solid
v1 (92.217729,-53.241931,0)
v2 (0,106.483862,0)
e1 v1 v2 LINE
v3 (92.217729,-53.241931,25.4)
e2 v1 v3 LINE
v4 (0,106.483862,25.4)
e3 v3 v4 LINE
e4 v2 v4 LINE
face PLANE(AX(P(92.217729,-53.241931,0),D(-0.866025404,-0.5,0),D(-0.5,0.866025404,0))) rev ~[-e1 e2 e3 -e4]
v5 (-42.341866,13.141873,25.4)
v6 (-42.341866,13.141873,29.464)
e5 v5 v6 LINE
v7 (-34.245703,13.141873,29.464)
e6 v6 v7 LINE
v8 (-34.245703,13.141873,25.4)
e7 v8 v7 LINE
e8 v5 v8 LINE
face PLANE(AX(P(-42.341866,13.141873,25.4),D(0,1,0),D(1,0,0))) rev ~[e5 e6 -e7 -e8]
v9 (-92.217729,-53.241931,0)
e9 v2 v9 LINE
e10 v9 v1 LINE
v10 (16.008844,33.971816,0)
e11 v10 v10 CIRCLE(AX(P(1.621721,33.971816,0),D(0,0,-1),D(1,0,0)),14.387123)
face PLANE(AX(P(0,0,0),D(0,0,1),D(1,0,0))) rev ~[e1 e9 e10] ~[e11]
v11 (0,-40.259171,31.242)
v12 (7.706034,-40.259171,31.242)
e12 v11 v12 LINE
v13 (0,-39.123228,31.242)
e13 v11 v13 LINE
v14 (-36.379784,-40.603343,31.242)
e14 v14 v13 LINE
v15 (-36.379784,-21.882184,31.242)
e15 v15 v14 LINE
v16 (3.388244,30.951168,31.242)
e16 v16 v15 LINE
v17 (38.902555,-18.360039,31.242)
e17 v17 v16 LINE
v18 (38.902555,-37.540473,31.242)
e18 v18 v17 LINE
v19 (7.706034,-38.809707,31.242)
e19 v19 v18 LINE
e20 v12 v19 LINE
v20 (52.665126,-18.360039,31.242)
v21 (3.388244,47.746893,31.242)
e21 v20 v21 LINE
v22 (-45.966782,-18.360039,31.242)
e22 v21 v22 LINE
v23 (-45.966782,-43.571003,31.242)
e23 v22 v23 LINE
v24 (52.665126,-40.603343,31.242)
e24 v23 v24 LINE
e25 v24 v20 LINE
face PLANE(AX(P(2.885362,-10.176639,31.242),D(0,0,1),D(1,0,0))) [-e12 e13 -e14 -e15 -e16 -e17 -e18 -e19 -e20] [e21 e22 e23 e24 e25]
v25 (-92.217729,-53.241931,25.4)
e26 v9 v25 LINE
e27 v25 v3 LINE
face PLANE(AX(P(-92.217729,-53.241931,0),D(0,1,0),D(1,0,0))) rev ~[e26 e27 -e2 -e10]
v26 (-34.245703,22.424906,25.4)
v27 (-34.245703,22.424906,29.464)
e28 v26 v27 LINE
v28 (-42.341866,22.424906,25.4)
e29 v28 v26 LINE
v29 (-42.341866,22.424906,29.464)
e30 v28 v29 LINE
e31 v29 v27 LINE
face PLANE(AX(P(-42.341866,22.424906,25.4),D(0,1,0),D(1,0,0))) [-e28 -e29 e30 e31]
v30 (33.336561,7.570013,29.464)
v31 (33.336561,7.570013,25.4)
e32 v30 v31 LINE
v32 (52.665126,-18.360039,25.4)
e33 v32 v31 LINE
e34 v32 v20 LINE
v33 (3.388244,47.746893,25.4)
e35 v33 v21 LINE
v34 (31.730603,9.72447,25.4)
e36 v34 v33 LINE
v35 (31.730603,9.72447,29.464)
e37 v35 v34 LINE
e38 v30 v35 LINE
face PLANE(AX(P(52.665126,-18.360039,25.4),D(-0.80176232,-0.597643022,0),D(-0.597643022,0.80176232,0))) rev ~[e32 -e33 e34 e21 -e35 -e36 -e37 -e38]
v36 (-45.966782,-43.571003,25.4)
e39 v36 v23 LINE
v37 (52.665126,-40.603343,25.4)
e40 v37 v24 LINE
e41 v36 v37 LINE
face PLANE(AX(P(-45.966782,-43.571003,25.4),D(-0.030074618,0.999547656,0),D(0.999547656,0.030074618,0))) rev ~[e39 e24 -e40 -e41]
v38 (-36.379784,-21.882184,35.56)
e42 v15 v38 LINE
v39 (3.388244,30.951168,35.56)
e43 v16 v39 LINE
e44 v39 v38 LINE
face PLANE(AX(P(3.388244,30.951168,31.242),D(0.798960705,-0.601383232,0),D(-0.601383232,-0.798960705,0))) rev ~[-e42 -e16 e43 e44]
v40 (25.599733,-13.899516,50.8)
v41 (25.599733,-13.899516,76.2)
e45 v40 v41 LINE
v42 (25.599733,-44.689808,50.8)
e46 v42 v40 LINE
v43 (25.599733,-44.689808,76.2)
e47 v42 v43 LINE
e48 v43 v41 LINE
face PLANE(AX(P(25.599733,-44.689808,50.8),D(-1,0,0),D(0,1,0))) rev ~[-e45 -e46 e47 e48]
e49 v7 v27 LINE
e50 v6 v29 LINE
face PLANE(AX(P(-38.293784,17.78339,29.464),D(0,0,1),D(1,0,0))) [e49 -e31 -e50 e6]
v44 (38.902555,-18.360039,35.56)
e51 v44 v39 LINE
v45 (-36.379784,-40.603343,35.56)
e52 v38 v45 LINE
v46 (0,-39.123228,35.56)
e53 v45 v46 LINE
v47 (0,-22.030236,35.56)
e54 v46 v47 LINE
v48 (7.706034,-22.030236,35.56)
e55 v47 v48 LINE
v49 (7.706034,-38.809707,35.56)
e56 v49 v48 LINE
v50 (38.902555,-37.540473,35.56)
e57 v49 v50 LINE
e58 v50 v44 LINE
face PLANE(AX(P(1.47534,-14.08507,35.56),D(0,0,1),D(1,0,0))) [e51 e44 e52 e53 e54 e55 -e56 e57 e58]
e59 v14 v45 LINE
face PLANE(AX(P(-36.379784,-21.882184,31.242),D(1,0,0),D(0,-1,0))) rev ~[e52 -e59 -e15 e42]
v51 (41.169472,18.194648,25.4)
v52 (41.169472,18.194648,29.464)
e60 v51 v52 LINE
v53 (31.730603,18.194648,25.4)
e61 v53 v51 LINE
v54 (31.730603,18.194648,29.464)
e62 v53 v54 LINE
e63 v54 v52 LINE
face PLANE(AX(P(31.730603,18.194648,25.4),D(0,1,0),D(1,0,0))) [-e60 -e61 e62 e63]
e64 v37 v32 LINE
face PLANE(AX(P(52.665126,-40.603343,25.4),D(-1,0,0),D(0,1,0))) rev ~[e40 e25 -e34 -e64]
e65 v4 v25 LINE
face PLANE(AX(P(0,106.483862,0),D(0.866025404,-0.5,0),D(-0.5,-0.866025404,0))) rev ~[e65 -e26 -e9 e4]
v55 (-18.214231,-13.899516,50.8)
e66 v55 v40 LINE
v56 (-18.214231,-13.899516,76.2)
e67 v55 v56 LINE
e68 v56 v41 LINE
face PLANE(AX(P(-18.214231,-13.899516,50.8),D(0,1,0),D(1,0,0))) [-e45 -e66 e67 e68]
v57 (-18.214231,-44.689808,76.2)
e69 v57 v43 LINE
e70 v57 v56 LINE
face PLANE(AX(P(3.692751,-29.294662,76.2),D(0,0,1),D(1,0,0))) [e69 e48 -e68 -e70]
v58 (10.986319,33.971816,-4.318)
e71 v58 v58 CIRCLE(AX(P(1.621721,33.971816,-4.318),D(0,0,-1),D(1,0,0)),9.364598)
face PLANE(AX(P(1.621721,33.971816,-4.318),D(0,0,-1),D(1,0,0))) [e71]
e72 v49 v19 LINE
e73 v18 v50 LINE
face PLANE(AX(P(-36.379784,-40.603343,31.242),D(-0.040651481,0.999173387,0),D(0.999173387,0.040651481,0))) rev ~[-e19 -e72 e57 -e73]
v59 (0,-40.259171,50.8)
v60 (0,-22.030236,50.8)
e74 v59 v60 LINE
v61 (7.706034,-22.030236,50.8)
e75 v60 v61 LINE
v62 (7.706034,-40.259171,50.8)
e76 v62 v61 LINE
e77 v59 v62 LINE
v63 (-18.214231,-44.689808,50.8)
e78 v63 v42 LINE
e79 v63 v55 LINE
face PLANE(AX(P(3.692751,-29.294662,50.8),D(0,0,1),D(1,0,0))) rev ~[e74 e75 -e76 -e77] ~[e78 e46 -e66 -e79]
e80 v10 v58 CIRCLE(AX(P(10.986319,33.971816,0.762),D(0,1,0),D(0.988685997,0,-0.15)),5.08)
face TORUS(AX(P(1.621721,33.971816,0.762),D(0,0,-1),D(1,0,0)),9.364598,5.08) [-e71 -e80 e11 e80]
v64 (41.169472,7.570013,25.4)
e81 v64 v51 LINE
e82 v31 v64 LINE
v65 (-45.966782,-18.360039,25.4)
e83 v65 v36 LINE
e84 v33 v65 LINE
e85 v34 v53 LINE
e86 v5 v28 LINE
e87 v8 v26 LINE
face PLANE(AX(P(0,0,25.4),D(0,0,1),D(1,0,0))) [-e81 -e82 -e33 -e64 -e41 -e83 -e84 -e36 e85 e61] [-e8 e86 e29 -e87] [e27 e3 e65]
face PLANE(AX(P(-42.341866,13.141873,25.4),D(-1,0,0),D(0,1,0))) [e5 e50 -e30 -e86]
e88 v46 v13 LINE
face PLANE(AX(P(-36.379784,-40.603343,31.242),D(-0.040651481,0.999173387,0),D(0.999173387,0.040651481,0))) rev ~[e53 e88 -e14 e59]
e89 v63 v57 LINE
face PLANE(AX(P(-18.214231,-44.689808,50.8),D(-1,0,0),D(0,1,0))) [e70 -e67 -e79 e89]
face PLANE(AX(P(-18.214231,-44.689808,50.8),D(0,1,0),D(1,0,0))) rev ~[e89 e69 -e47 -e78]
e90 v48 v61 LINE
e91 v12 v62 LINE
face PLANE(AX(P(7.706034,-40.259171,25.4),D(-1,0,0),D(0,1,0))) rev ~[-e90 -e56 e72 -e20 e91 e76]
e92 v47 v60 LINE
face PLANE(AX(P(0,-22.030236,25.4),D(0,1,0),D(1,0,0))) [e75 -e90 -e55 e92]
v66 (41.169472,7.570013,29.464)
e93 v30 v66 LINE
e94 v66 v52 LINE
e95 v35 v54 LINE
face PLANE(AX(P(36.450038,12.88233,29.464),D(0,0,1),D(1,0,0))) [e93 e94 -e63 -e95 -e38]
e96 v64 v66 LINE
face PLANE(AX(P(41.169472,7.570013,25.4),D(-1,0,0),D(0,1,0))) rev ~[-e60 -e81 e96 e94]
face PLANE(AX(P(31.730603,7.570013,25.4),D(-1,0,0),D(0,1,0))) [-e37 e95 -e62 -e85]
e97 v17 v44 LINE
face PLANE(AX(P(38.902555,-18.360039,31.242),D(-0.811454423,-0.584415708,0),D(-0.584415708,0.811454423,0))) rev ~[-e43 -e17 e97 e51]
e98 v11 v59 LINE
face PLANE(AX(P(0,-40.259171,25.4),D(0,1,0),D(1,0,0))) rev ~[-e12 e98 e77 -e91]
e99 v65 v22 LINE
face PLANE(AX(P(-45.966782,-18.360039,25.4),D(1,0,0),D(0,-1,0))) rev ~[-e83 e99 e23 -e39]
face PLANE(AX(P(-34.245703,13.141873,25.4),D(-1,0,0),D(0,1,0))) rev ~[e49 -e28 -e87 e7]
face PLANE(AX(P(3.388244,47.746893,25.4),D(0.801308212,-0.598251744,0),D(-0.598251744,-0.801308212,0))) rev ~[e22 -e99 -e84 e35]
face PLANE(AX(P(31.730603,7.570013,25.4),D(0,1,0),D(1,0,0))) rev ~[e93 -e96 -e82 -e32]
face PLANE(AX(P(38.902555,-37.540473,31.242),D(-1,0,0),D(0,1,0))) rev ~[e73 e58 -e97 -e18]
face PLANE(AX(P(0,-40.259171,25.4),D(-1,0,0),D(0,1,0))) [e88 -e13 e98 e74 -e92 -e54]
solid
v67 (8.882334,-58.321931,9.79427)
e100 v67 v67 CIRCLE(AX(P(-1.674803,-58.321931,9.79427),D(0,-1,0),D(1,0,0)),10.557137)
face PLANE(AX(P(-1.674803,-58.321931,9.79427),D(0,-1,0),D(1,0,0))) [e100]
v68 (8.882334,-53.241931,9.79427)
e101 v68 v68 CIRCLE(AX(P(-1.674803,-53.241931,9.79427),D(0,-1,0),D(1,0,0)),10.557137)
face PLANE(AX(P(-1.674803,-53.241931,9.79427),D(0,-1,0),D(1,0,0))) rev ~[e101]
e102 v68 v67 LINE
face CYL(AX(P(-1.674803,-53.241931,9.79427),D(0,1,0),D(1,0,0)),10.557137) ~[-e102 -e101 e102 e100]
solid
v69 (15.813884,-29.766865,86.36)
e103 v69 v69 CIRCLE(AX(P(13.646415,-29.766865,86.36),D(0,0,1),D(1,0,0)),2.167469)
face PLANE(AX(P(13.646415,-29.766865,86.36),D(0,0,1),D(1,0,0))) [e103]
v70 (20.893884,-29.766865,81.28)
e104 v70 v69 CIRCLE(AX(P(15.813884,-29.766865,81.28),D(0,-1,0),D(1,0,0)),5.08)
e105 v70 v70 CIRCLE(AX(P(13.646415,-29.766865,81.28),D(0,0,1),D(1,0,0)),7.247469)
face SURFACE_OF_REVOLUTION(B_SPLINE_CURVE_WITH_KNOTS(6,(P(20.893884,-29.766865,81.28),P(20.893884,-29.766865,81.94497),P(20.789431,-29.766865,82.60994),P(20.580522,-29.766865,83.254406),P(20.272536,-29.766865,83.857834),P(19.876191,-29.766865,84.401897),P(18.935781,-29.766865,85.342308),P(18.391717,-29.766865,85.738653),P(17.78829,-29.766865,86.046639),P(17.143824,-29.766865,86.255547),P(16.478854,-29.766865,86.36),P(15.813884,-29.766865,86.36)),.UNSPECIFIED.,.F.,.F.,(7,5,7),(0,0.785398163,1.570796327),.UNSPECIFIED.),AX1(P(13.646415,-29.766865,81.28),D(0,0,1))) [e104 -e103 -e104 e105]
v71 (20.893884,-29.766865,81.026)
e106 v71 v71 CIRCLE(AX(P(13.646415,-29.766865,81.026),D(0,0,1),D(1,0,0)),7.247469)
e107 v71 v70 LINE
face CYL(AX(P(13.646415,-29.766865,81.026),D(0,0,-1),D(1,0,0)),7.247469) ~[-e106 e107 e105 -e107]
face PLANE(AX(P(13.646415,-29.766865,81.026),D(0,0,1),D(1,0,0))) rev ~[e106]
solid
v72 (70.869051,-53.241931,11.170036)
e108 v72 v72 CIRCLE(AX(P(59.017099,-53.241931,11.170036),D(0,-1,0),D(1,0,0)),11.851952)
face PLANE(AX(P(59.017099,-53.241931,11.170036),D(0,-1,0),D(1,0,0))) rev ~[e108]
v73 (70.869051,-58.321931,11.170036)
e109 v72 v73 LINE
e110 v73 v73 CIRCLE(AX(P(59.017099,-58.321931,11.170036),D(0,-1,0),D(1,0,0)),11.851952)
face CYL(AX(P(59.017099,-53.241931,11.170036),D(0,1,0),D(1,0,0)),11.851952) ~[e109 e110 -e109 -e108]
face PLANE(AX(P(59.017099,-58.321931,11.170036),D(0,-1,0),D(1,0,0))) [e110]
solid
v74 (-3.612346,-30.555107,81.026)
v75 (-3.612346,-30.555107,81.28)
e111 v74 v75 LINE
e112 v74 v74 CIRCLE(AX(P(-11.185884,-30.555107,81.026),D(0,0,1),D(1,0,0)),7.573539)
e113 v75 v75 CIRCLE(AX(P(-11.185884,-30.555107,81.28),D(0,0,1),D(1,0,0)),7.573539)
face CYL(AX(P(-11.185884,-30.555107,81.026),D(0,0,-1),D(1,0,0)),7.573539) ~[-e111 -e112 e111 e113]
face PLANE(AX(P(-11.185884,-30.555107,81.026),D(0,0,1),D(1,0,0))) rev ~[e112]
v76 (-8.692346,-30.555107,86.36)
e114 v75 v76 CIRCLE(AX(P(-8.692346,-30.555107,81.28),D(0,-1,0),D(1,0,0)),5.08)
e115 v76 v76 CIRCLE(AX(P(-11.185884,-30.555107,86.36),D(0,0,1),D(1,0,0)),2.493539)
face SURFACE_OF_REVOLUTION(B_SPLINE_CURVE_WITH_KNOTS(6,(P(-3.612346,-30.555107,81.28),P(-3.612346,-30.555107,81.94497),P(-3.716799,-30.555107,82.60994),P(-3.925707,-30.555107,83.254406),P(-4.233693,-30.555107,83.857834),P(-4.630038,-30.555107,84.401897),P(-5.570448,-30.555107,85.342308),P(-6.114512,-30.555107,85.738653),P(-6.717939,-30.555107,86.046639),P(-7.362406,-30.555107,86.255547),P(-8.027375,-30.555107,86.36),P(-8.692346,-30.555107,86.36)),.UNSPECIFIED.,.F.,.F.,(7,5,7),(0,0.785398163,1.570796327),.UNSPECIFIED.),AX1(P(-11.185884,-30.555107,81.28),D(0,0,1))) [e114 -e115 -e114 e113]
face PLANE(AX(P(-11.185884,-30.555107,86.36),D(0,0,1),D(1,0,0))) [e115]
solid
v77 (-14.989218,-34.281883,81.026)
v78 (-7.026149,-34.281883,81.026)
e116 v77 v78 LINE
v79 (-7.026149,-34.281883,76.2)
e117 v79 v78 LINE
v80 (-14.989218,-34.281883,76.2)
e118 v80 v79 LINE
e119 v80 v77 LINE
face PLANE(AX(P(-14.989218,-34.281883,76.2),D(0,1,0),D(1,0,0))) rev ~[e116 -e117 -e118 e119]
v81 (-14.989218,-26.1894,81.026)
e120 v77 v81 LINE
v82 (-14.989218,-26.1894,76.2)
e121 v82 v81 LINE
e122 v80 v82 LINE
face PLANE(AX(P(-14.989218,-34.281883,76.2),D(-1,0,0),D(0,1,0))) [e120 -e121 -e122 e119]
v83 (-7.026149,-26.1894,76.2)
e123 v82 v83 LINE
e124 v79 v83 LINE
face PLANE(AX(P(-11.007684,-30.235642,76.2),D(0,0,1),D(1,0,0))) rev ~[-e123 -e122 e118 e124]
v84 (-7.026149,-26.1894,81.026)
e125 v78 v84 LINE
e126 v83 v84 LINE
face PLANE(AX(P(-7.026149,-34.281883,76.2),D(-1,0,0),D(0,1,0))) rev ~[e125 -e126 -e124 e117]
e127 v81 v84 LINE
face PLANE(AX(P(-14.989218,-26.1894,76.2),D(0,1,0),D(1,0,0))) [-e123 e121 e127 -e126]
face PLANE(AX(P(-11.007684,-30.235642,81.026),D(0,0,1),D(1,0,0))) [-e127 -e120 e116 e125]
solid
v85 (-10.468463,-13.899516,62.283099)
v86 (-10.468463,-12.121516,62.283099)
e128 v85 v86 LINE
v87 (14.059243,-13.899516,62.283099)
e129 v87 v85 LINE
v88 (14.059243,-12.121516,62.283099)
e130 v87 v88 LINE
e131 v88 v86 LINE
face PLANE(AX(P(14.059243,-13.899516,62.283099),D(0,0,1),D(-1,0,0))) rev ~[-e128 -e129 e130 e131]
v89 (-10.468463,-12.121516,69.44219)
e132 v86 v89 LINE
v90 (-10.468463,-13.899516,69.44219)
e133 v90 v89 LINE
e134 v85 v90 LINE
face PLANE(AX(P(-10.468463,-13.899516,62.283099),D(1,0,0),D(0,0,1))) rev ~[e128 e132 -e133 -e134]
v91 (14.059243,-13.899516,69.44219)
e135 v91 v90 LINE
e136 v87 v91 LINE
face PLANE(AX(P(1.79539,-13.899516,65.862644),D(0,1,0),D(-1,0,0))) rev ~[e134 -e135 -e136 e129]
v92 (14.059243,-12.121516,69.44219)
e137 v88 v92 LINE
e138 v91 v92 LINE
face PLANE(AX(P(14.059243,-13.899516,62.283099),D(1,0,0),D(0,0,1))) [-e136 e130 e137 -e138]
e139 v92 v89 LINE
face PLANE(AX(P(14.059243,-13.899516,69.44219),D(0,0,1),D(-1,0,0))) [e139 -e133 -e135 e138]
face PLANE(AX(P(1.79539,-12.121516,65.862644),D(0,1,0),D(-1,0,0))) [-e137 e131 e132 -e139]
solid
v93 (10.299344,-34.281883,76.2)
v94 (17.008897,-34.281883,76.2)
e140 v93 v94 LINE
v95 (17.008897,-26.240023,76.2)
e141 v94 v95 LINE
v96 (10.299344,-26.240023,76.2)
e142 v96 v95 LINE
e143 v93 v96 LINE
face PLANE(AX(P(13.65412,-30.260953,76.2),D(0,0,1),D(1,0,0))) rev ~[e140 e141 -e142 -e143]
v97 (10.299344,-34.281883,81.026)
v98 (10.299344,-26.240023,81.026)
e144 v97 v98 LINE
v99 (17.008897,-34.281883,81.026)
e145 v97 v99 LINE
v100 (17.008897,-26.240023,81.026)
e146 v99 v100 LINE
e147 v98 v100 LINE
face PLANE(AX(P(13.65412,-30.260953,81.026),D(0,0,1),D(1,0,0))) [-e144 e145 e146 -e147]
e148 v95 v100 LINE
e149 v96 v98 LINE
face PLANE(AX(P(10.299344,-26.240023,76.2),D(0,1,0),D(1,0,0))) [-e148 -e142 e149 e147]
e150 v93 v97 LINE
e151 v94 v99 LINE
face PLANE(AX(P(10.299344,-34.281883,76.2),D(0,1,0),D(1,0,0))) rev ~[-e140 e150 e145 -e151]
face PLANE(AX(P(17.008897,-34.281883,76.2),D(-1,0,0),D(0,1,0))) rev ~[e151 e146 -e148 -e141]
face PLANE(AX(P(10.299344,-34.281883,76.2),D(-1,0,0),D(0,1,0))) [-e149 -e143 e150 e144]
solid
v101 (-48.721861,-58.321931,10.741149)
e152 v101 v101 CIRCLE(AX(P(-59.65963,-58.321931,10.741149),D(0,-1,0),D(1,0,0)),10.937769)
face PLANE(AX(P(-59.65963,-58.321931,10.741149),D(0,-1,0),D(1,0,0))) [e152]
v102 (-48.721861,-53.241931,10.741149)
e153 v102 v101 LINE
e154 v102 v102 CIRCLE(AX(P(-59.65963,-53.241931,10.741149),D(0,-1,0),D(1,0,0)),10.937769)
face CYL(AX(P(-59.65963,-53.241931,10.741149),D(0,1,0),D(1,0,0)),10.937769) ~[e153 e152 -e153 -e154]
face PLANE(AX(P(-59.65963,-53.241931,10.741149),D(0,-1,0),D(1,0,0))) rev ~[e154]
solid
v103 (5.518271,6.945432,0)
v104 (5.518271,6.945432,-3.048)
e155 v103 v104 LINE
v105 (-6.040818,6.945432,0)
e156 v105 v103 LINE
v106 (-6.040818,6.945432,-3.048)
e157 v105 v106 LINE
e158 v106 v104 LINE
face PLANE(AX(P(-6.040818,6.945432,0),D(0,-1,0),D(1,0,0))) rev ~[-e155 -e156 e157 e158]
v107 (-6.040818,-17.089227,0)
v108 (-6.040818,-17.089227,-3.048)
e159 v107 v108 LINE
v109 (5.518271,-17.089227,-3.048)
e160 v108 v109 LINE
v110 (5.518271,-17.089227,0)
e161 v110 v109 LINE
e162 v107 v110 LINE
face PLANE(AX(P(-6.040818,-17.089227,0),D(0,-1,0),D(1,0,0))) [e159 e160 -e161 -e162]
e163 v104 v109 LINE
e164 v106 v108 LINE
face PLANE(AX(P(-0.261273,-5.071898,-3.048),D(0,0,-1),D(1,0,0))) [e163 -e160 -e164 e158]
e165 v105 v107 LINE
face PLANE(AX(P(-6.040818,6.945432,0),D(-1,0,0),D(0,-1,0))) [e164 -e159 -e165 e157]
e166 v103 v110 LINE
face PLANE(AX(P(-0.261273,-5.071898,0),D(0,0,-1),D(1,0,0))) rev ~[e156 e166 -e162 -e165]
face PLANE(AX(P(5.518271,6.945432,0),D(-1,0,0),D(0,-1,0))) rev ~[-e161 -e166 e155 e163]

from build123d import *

# Parameters (mm, degrees)
F1_DEPTH  = 25.4
F2_W      = 7.7060335316
F2_H      = 18.2289350778
F3_DEPTH  = 25.4
F4_W      = 43.813964352
F4_H      = 30.7902917266
F5_DEPTH  = 25.4
F7_DEPTH  = 5.842
F9_DEPTH  = 4.318
F10_R     = 10.9377694976
F11_DEPTH = 5.08
F10_R_2   = 10.5571366777
F10_R_3   = 11.8519516329
F12_W     = 11.5590882488
F12_H     = 24.0346593782
F13_DEPTH = 3.048
F14_R     = 14.3871232907
F15_DEPTH = 4.318
F17_W     = 24.5277062058
F17_H     = 7.1590915322
F18_DEPTH = 1.778
F19_W     = 8.0961622298
F19_H     = 9.2830331996
F19_W_2   = 9.4388686121
F19_H_2   = 10.6246345676
F20_DEPTH = 4.064
F21_W     = 6.7095533013
F21_H     = 8.0418605357
F22_DEPTH = 4.826
F21_W_2   = 7.9630683176
F21_H_2   = 8.0924835056
F23_R     = 7.24746932
F24_DEPTH = 5.334
F23_R_2   = 7.57353882
F25_R     = 5.08
F26_R     = 5.08


# Not quite as in the source:
# - a fillet or chamfer that OpenCascade refuses, or shapes differently, is made with other operations: its cross-section is extruded or revolved along the edge and cut away or added


with BuildPart() as f1:
    # F0 (on Top) → F1 (new body)
    with BuildSketch(Plane.XY):
        Polygon((-92.2177294153, -53.241930902), (92.2177294153, -53.241930902), (0, 106.483861804), align=None)
    extrude(amount=F1_DEPTH)

    # F2 (on face) → F3 (join)
    with BuildSketch(Plane.XY.offset(25.4)):
        with Locations((3.8530167658, -31.1447037384)):
            Rectangle(F2_W, F2_H)
    extrude(amount=F3_DEPTH)

    # F4 (on face) → F5 (join)
    with BuildSketch(Plane.XY.offset(50.8)):
        with Locations((3.692750819, -29.2946621776)):
            Rectangle(F4_W, F4_H)
    extrude(amount=F5_DEPTH)

    # F6 (on face) → F7 (join)
    with BuildSketch(Plane.XY.offset(25.4)):
        Polygon((-45.9667816758, -43.5710027814), (52.6651255786, -40.6033433974), (52.6651255786, -18.3600392193), (3.388244193, 47.7468930185), (-45.9667816758, -18.3600392193), align=None)
    extrude(amount=F7_DEPTH)

    # F8 (on face) → F9 (join)
    with BuildSketch(Plane.XY.offset(31.242)):
        Polygon((-36.3797843456, -40.6033433974), (38.902554661, -37.5404730439), (38.902554661, -18.3600392193), (3.388244193, 30.9511683881), (-36.3797843456, -21.8821838498), align=None)
    extrude(amount=F9_DEPTH)

    # F14 (on face) → F15 (join)
    with BuildSketch(Plane(origin=(0, 0, 0), x_dir=(1, 0, 0), z_dir=(0, 0, -1))):
        with Locations((1.6217207303, -33.9718163013)):
            Circle(F14_R)
    extrude(amount=F15_DEPTH)

    # F16: fillet of radius 5.08 on 1 edges, made by hand

    # F16_s1 → F16_t2 (revolve, cut)
    with BuildSketch(Plane.XZ.offset(-33.9718163013)):
        with BuildLine():
            ThreePointArc((16.008844021, 0), (14.2980739798, -3.0901007256), (10.986319158, -4.318))
            Line((10.986319158, -4.318), (16.008844021, -4.318))
            Line((16.008844021, -4.318), (16.008844021, 0))
        make_face()
    revolve(axis=Axis((1.6217207303, 33.9718163013, -4.318), (0, 0, -1)), mode=Mode.SUBTRACT)

    # F19 (on face) → F20 (join)
    with BuildSketch(Plane.XY.offset(25.4)):
        with Locations((-38.2937844843, 17.7833898924)):
            Rectangle(F19_W, F19_H)
        with Locations((36.4500377327, 12.8823302221)):
            Rectangle(F19_W_2, F19_H_2)
    extrude(amount=F20_DEPTH)


with BuildPart() as f11:
    # F10 (on face) → F11 (new body)
    with BuildSketch(Plane.XZ.offset(53.241930902)):
        with Locations((-59.6596300602, 10.7411490753)):
            Circle(F10_R)
    extrude(amount=F11_DEPTH)


with BuildPart() as f11b:
    # F10 (on face) → F11, piece 2 (new body)
    with BuildSketch(Plane.XZ.offset(53.241930902)):
        with Locations((-1.674802741, 9.7942696884)):
            Circle(F10_R_2)
    extrude(amount=F11_DEPTH)


with BuildPart() as f11c:
    # F10 (on face) → F11, piece 3 (new body)
    with BuildSketch(Plane.XZ.offset(53.241930902)):
        with Locations((59.0170994401, 11.1700361595)):
            Circle(F10_R_3)
    extrude(amount=F11_DEPTH)


with BuildPart() as f13:
    # F12 (on face) → F13 (new body)
    with BuildSketch(Plane(origin=(0, 0, 0), x_dir=(1, 0, 0), z_dir=(0, 0, -1))):
        with Locations((-0.2612734679, 5.0718975253)):
            Rectangle(F12_W, F12_H)
    extrude(amount=F13_DEPTH)


with BuildPart() as f18:
    # F17 (on face) → F18 (new body)
    with BuildSketch(Plane(origin=(0, -13.8995163143, 0), x_dir=(-1, 0, 0), z_dir=(0, 1, 0))):
        with Locations((-1.7953896895, 65.8626444638)):
            Rectangle(F17_W, F17_H)
    extrude(amount=F18_DEPTH)


with BuildPart() as f22:
    # F21 (on face) → F22 (new body)
    with BuildSketch(Plane.XY.offset(76.2)):
        with Locations((13.6541202664, -30.2609531209)):
            Rectangle(F21_W, F21_H)
    extrude(amount=F22_DEPTH)


with BuildPart() as f22b:
    # F21 (on face) → F22, piece 2 (new body)
    with BuildSketch(Plane.XY.offset(76.2)):
        with Locations((-11.0076835845, -30.235641636)):
            Rectangle(F21_W_2, F21_H_2)
    extrude(amount=F22_DEPTH)


with BuildPart() as f24:
    # F23 (on face) → F24 (new body)
    with BuildSketch(Plane.XY.offset(81.026)):
        with Locations((13.6464145035, -29.7668650746)):
            Circle(F23_R)
    extrude(amount=F24_DEPTH)

    # F26
    f26_edges = [f24.edges().sort_by_distance(p)[0] for p in [
        (6.398945, -29.766865, 86.36),
    ]]
    fillet(f26_edges, radius=F26_R)


with BuildPart() as f24b:
    # F23 (on face) → F24, piece 2 (new body)
    with BuildSketch(Plane.XY.offset(81.026)):
        with Locations((-11.1858844757, -30.5551066995)):
            Circle(F23_R_2)
    extrude(amount=F24_DEPTH)

    # F25
    f25_edges = [f24b.edges().sort_by_distance(p)[0] for p in [
        (-18.759423, -30.555107, 86.36),
    ]]
    fillet(f25_edges, radius=F25_R)


solid = Compound([f1.part, f11.part, f11b.part, f11c.part, f13.part, f18.part, f22.part, f22b.part, f24.part, f24b.part])
